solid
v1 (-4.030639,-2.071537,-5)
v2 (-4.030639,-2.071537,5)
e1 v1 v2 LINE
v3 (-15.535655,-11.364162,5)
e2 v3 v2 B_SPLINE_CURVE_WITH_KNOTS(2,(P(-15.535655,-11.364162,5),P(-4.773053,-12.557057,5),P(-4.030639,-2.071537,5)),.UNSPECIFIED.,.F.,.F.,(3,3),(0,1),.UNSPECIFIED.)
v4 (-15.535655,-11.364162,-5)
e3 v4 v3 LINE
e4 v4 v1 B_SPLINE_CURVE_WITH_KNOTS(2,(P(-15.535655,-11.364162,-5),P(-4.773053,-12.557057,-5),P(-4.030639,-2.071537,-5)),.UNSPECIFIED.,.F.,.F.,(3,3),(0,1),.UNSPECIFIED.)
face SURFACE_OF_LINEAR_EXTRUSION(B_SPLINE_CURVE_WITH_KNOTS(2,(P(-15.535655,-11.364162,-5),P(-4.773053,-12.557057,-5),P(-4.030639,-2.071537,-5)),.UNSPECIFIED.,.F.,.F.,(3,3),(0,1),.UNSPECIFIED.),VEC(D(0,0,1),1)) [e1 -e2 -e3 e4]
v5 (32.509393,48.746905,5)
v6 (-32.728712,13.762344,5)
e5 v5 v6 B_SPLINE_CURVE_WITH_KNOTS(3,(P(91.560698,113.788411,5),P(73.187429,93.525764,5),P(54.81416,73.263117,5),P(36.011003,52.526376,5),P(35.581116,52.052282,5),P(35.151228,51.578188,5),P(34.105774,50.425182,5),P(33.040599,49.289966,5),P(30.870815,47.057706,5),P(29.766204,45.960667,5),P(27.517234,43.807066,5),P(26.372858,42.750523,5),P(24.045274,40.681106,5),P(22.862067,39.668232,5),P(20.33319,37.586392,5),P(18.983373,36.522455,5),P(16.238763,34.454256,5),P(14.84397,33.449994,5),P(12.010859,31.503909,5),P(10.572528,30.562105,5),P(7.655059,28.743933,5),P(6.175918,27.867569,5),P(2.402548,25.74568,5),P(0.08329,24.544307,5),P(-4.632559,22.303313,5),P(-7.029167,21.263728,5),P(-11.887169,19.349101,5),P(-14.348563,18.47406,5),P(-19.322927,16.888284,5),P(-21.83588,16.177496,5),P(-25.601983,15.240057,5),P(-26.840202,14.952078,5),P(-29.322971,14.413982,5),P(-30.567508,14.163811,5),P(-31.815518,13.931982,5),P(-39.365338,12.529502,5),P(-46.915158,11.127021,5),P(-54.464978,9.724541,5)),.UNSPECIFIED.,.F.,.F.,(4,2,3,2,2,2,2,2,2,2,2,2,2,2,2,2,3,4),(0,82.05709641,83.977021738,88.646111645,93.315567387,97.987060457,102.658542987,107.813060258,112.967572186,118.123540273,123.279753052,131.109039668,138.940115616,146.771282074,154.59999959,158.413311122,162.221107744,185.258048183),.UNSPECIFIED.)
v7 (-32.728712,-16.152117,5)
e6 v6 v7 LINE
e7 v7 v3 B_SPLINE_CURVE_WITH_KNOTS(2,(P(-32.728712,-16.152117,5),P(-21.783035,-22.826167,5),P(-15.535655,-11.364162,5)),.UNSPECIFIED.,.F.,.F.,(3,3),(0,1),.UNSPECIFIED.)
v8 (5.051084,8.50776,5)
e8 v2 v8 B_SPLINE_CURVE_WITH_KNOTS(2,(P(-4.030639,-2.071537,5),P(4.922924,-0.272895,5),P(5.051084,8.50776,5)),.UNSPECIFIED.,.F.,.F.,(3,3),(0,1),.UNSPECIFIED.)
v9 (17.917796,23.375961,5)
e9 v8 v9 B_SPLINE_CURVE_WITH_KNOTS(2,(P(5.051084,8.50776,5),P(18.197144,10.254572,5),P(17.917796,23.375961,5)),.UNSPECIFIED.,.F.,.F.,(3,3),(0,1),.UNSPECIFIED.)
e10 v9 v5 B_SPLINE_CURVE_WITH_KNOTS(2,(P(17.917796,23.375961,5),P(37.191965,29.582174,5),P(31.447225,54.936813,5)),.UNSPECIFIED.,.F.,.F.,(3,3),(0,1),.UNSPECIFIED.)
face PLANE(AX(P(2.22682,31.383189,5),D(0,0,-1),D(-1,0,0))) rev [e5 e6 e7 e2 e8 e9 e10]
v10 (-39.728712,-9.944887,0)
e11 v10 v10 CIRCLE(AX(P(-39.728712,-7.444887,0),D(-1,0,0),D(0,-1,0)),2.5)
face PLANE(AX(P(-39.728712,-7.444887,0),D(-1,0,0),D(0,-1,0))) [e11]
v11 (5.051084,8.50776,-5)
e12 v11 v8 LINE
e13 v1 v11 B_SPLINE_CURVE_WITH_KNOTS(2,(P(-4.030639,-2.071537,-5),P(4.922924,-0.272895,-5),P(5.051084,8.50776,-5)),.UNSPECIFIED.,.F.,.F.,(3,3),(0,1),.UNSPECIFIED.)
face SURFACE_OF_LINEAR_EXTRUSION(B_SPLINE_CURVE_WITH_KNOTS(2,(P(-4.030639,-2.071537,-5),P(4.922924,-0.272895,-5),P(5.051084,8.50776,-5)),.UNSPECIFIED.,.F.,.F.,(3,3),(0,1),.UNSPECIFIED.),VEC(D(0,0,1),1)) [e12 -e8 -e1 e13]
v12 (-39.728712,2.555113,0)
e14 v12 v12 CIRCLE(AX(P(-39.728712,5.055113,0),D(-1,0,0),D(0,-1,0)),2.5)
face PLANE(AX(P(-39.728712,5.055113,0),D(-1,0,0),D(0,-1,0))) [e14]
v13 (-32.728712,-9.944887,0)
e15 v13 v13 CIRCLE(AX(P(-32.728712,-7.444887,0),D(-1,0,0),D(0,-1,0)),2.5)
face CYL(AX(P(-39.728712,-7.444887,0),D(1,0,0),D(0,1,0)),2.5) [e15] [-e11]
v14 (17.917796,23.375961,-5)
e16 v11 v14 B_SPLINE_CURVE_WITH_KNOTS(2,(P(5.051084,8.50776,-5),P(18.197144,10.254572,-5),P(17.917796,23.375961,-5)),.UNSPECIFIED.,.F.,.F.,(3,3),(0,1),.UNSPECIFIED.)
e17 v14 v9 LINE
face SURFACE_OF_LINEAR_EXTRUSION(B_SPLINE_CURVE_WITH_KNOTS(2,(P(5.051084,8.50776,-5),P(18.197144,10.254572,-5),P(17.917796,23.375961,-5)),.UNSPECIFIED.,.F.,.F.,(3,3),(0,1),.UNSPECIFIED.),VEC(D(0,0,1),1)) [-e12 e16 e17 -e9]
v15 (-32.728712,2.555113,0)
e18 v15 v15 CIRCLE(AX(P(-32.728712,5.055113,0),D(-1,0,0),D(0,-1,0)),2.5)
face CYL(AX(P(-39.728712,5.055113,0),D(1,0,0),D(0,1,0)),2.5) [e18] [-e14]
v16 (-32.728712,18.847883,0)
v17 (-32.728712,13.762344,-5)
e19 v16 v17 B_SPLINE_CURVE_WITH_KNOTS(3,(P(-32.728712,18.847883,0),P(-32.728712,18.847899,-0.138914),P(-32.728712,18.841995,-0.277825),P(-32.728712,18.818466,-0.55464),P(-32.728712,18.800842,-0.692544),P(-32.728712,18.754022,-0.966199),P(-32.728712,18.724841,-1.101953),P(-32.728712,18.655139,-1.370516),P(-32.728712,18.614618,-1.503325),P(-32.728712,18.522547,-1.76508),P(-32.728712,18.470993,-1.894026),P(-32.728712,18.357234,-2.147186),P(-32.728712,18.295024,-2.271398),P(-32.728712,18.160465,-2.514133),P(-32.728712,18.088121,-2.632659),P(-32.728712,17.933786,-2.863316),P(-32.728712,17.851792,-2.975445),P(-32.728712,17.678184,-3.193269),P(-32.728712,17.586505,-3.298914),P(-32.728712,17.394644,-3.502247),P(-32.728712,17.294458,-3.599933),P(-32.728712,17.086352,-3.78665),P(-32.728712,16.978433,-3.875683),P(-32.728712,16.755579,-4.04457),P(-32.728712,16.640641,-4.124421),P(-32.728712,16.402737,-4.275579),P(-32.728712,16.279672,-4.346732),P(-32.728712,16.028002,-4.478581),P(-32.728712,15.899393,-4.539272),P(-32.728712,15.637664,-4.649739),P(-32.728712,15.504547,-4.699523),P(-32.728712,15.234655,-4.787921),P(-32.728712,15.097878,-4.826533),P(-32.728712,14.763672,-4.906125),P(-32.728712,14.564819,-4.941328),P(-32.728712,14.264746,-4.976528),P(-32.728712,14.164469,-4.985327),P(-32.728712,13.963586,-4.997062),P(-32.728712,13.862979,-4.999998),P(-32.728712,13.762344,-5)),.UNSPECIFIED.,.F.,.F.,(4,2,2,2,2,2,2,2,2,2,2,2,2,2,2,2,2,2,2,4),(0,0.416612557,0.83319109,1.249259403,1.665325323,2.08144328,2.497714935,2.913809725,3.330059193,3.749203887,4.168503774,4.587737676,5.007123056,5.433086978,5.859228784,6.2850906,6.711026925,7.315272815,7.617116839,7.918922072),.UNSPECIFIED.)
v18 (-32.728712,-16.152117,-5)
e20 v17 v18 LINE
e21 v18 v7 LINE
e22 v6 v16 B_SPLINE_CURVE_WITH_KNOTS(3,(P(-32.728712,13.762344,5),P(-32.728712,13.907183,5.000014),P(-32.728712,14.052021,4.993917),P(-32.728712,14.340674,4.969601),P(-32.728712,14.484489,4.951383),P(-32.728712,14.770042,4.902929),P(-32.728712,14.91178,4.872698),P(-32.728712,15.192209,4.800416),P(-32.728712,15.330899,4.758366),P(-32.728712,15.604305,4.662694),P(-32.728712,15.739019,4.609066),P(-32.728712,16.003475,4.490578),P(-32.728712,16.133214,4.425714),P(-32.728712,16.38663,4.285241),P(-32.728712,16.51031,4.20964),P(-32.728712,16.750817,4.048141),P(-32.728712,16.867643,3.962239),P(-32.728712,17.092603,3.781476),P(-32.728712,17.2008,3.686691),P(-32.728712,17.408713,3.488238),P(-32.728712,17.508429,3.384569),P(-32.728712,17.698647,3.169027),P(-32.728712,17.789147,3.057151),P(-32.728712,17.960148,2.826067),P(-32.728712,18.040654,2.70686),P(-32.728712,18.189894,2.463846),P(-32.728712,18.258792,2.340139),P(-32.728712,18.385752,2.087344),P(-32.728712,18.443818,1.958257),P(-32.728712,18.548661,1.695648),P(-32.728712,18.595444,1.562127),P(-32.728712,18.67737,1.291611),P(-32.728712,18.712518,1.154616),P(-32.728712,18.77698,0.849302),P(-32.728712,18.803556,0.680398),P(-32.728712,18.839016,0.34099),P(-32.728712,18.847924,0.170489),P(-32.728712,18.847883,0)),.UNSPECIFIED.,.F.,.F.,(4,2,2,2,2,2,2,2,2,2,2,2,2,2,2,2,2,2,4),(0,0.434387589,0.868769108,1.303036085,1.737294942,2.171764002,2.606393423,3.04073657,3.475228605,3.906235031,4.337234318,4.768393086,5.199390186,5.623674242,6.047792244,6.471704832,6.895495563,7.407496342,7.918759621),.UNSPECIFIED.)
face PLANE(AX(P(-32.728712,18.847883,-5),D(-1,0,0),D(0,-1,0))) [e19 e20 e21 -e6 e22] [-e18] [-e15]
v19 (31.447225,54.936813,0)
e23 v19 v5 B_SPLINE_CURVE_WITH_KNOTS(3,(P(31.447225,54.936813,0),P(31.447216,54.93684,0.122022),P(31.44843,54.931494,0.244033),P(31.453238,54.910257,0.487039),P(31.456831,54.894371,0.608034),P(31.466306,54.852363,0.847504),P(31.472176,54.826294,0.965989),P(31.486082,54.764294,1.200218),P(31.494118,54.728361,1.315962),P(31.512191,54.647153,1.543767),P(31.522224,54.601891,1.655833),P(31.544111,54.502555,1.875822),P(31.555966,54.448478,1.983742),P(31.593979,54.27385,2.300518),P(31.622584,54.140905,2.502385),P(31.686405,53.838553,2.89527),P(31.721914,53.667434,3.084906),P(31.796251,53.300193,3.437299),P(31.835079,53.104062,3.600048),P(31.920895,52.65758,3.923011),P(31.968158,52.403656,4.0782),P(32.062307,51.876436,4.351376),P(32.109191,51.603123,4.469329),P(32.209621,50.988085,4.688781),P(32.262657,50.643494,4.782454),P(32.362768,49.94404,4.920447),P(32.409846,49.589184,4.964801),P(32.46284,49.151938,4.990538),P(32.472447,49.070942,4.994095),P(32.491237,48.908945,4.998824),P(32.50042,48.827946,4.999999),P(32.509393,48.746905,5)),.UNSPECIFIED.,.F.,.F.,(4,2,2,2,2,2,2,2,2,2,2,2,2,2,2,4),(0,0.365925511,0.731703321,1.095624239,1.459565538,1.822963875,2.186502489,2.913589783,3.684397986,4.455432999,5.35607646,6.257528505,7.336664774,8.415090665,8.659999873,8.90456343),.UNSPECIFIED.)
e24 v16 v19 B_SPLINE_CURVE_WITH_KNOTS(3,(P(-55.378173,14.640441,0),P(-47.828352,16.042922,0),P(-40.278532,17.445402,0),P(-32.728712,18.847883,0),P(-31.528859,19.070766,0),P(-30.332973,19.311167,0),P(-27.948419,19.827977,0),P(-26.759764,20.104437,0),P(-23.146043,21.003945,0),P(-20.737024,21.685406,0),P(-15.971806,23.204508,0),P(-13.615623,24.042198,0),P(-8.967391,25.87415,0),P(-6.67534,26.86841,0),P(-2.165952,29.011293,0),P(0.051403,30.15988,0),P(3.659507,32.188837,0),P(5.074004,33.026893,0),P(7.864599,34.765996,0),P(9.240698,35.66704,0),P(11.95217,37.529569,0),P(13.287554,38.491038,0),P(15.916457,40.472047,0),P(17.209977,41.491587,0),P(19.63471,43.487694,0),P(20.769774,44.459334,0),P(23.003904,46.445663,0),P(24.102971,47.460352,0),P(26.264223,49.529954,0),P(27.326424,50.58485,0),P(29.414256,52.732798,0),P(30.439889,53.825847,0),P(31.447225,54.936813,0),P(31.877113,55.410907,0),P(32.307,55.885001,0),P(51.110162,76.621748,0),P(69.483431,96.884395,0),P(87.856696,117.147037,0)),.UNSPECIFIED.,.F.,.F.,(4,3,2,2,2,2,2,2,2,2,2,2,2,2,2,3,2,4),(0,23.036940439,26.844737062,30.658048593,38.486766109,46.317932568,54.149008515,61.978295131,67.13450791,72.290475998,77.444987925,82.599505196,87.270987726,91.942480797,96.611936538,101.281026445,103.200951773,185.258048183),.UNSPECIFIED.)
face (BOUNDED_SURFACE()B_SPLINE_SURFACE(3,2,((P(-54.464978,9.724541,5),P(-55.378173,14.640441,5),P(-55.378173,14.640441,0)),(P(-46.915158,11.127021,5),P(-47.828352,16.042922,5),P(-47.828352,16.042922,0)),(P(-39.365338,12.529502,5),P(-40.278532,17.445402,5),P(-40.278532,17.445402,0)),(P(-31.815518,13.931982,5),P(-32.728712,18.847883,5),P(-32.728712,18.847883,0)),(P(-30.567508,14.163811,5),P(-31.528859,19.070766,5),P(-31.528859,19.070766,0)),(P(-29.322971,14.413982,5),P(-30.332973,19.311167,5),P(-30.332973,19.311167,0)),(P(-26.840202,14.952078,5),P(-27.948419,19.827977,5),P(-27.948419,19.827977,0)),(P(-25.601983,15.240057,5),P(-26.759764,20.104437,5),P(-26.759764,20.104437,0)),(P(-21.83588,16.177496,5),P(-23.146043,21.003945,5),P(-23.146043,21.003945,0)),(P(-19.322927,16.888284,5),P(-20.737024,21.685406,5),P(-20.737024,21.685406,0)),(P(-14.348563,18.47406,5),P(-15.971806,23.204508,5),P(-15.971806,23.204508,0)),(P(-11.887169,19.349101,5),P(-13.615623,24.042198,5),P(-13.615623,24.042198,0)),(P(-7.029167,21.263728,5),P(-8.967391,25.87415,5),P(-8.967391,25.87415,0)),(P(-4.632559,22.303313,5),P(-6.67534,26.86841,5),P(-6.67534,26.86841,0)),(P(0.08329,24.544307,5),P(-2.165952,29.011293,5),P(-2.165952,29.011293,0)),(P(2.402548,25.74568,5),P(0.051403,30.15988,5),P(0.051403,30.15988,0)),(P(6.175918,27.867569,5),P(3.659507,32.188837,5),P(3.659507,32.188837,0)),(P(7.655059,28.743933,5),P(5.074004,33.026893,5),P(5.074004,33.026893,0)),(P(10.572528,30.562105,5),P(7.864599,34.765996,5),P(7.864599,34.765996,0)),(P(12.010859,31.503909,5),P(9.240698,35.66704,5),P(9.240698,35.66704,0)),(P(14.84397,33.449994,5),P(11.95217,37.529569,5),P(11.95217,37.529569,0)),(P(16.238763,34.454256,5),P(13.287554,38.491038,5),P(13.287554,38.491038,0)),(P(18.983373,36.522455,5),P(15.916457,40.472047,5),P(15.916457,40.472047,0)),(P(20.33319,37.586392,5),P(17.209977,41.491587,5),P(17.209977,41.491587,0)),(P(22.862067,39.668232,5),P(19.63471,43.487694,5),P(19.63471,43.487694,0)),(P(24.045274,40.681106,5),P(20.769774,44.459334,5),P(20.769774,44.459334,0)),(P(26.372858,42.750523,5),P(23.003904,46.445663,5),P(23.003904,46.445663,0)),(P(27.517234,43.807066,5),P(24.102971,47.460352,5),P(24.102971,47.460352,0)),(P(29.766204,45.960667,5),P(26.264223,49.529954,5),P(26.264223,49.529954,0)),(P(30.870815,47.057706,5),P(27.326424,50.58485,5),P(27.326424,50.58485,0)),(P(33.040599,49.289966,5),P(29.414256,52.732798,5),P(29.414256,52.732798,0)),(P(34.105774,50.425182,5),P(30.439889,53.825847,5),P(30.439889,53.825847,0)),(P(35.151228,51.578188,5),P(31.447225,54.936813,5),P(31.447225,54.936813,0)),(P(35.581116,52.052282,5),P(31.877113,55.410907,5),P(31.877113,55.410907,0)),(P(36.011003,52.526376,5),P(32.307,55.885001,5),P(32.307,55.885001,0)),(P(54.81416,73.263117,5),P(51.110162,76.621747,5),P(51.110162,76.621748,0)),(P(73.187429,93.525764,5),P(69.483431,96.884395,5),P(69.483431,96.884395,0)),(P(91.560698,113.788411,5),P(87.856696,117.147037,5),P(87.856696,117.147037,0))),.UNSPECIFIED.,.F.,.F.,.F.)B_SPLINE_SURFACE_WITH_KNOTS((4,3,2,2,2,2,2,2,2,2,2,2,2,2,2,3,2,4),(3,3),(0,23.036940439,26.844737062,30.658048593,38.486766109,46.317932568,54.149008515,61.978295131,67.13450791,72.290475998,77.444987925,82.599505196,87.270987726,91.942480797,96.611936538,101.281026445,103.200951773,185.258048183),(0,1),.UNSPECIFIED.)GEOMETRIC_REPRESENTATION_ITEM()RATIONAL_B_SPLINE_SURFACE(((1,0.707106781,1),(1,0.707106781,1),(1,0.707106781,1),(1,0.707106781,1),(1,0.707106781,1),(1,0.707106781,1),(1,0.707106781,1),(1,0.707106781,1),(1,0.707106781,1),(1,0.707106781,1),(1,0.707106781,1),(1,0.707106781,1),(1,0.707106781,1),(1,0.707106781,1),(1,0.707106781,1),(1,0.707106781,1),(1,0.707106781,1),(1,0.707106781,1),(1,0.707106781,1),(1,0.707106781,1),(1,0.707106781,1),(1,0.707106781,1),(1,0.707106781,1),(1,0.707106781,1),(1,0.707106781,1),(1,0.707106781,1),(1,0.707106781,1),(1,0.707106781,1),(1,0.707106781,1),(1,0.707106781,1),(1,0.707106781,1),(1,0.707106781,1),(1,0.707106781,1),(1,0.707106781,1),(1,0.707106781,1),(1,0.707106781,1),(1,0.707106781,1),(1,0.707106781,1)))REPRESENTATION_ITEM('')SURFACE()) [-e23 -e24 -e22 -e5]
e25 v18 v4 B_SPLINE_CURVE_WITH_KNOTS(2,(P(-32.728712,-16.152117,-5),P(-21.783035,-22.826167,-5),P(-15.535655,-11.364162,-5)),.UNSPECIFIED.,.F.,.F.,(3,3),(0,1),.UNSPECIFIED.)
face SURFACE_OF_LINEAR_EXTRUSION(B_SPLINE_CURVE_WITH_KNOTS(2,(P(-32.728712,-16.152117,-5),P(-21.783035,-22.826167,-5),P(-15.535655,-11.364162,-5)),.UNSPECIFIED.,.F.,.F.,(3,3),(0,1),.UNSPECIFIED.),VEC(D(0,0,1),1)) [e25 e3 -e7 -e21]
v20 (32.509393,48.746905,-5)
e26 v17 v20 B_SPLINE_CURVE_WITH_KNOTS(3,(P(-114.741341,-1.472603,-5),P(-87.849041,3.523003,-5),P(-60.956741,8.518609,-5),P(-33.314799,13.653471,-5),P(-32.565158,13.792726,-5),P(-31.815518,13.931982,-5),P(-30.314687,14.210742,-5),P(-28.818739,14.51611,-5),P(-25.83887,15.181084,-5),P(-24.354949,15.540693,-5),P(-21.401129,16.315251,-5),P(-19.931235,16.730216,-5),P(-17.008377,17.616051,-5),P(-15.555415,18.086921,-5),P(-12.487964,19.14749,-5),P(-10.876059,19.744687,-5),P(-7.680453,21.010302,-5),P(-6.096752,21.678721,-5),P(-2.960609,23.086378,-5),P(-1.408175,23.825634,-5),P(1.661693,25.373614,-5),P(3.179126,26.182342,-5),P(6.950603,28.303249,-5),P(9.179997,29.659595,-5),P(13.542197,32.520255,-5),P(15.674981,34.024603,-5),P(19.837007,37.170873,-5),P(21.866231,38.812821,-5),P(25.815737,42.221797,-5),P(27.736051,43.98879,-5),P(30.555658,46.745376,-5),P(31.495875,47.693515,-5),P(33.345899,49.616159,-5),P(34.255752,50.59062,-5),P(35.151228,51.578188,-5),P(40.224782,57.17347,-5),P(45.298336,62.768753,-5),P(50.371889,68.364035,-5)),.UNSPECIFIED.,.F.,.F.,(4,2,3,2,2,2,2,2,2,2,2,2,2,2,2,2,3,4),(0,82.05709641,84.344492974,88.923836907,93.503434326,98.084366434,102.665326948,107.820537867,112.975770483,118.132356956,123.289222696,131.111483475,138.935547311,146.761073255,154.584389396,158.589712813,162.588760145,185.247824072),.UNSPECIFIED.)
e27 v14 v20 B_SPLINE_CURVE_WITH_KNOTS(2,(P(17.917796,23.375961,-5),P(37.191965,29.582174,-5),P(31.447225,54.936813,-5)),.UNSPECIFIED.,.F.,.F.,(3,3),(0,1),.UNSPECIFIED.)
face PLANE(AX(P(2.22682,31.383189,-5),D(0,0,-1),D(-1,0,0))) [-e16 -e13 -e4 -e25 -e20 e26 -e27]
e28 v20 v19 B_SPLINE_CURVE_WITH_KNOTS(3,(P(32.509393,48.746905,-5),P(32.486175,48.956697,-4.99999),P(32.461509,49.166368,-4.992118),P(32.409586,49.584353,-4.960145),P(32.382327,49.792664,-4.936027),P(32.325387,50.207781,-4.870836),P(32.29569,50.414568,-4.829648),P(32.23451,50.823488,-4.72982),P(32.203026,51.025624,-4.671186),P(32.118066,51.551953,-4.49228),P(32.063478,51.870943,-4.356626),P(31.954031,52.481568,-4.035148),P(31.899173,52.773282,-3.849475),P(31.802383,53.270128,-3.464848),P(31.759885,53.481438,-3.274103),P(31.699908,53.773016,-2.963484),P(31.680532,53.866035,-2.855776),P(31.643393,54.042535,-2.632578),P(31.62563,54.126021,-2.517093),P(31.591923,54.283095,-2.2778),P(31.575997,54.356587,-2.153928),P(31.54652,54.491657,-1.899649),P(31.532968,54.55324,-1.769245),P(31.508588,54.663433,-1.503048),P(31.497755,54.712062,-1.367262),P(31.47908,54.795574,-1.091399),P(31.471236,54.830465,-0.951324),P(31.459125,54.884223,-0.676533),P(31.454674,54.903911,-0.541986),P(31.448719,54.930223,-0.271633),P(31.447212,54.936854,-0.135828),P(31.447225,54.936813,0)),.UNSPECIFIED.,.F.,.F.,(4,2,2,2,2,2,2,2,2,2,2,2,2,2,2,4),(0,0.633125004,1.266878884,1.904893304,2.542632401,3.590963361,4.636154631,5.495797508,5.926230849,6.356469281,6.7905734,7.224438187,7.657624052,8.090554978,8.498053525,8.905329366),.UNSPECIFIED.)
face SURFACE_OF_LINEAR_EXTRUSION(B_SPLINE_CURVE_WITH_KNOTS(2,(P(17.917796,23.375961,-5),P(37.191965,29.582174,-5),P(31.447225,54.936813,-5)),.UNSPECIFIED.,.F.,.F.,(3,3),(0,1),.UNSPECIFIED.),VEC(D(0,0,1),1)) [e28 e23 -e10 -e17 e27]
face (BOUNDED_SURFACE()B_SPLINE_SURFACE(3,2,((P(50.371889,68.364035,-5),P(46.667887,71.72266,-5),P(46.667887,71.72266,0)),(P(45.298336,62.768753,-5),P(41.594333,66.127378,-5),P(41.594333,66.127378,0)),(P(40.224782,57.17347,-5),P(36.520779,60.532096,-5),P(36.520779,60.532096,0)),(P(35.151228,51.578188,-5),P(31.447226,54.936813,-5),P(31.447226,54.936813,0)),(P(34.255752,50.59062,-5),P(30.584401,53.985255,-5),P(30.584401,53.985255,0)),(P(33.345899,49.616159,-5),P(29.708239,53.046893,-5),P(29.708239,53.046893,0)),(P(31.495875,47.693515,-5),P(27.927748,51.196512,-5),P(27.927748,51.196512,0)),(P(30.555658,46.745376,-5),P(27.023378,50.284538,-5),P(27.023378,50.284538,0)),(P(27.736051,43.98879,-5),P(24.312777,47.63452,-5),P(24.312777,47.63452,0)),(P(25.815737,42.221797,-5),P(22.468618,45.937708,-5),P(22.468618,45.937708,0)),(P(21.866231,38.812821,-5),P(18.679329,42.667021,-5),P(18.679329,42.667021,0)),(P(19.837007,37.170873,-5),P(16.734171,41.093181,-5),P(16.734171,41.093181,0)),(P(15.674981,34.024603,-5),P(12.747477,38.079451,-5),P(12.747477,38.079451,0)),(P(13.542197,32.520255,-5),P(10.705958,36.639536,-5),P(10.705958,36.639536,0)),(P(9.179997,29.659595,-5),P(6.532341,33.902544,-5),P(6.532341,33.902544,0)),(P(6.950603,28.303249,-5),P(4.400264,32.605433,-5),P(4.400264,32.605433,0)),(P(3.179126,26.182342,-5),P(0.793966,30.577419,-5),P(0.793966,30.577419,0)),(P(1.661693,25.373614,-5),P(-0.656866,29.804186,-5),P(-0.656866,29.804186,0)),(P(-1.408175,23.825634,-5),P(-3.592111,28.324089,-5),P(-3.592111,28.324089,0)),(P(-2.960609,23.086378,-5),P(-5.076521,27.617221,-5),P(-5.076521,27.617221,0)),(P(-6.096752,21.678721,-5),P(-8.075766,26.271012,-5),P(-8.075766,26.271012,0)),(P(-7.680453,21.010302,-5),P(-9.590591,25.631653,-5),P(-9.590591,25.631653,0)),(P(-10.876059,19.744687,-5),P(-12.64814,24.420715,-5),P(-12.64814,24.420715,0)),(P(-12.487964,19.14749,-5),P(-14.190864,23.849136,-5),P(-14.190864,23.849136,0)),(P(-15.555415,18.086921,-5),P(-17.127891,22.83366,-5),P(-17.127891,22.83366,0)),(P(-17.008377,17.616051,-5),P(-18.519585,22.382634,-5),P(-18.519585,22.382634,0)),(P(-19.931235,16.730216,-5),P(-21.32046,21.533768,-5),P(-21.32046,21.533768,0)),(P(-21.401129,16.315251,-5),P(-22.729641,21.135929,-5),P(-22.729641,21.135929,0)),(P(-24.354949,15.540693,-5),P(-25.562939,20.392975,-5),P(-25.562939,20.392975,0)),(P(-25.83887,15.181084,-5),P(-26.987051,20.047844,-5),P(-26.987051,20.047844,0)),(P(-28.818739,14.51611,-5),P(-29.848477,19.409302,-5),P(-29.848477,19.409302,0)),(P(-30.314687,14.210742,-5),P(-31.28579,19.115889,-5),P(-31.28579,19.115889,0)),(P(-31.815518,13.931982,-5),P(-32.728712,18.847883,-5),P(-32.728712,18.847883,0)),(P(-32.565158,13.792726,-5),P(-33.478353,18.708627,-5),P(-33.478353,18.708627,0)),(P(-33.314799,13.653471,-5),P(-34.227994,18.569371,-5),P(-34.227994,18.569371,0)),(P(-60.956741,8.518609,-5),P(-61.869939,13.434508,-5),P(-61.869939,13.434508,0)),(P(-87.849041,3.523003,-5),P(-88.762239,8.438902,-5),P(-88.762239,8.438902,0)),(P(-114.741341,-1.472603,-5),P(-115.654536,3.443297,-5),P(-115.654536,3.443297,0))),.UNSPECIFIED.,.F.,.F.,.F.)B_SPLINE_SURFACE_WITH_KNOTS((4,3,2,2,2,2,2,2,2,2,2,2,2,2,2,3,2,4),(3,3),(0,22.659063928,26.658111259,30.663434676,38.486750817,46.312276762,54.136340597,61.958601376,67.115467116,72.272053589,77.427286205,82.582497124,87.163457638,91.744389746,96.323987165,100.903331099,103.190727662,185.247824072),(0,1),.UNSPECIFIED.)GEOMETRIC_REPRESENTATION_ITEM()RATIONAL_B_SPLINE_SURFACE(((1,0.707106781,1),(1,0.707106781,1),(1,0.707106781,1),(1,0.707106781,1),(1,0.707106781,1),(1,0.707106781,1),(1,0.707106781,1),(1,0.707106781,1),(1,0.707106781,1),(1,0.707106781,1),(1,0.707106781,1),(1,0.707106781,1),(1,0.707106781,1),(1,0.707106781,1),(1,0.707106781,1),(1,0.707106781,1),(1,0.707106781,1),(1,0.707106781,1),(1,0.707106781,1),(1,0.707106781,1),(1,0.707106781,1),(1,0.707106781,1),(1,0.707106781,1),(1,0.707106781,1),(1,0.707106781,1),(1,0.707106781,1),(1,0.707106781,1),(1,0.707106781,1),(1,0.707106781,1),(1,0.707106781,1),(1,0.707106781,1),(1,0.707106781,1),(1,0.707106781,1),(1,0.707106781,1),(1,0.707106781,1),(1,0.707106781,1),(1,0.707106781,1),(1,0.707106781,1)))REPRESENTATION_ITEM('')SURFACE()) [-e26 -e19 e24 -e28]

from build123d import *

# Parameters (mm, degrees)
EXTRUDE_1_DEPTH      = 5
EXTRUDE_1_DEPTH_BACK = 5
FILLET_3_R           = 5
SKETCH_2_R           = 2.5
EXTRUDE_2_DEPTH      = 7


with BuildPart() as part:
    # 草圖1 → 填料-伸長1 (new, two sides: drawn at the far end of the back side and taken through both)
    with BuildSketch(Plane.XY.offset(-EXTRUDE_1_DEPTH_BACK)):
        with BuildLine():
            Line((-32.728711913, 18.847882673), (-32.728711913, -16.152117327))
            add(Edge.make_bspline(
                [(-32.728711913, -16.152117327), (-21.783034561, -22.826167416), (-15.535655433, -11.364162116)],
                knots=[0, 0, 0, 1, 1, 1], degree=2))
            add(Edge.make_bspline(
                [(-15.535655433, -11.364162116), (-4.773052761, -12.557057066), (-4.030638728, -2.071536696)],
                knots=[0, 0, 0, 1, 1, 1], degree=2))
            add(Edge.make_bspline(
                [(5.051083958, 8.507759935), (4.922923736, -0.27289527), (-4.030638728, -2.071536696)],
                knots=[0, 0, 0, 1, 1, 1], degree=2))
            add(Edge.make_bspline(
                [(17.917796077, 23.375960607), (18.197143612, 10.254572471), (5.051083958, 8.507759935)],
                knots=[0, 0, 0, 1, 1, 1], degree=2))
            add(Edge.make_bspline(
                [(31.447225321, 54.936813216), (37.191964726, 29.582174335), (17.917796077, 23.375960607)],
                knots=[0, 0, 0, 1, 1, 1], degree=2))
            add(Edge.make_bspline(
                [(-32.728711913, 18.847882673), (5.094383594, 25.874030711), (31.447225321, 54.936813216)],
                knots=[0, 0, 0, 1, 1, 1], degree=2))
        make_face()
    extrude(amount=EXTRUDE_1_DEPTH + EXTRUDE_1_DEPTH_BACK)

    # 圓角3
    fillet_3_edges = [part.edges().sort_by_distance(p)[0] for p in [
        (2.226820149, 31.383189328, -5),
        (2.226820149, 31.383189328, 5),
    ]]
    fillet(fillet_3_edges, radius=FILLET_3_R - 0.0001)  # a hair under: the kernel refuses the full size

    # 草圖2 → 填料-伸長2 (add)
    with BuildSketch(Plane.ZY.offset(32.728711913)):
        with Locations(Location((0, 5.055113449, 0), (0, 0, 270))):
            Circle(SKETCH_2_R)
        with Locations(Location((0, -7.444886551, 0), (0, 0, 270))):
            Circle(SKETCH_2_R)
    extrude(amount=EXTRUDE_2_DEPTH)


solid = part.part
